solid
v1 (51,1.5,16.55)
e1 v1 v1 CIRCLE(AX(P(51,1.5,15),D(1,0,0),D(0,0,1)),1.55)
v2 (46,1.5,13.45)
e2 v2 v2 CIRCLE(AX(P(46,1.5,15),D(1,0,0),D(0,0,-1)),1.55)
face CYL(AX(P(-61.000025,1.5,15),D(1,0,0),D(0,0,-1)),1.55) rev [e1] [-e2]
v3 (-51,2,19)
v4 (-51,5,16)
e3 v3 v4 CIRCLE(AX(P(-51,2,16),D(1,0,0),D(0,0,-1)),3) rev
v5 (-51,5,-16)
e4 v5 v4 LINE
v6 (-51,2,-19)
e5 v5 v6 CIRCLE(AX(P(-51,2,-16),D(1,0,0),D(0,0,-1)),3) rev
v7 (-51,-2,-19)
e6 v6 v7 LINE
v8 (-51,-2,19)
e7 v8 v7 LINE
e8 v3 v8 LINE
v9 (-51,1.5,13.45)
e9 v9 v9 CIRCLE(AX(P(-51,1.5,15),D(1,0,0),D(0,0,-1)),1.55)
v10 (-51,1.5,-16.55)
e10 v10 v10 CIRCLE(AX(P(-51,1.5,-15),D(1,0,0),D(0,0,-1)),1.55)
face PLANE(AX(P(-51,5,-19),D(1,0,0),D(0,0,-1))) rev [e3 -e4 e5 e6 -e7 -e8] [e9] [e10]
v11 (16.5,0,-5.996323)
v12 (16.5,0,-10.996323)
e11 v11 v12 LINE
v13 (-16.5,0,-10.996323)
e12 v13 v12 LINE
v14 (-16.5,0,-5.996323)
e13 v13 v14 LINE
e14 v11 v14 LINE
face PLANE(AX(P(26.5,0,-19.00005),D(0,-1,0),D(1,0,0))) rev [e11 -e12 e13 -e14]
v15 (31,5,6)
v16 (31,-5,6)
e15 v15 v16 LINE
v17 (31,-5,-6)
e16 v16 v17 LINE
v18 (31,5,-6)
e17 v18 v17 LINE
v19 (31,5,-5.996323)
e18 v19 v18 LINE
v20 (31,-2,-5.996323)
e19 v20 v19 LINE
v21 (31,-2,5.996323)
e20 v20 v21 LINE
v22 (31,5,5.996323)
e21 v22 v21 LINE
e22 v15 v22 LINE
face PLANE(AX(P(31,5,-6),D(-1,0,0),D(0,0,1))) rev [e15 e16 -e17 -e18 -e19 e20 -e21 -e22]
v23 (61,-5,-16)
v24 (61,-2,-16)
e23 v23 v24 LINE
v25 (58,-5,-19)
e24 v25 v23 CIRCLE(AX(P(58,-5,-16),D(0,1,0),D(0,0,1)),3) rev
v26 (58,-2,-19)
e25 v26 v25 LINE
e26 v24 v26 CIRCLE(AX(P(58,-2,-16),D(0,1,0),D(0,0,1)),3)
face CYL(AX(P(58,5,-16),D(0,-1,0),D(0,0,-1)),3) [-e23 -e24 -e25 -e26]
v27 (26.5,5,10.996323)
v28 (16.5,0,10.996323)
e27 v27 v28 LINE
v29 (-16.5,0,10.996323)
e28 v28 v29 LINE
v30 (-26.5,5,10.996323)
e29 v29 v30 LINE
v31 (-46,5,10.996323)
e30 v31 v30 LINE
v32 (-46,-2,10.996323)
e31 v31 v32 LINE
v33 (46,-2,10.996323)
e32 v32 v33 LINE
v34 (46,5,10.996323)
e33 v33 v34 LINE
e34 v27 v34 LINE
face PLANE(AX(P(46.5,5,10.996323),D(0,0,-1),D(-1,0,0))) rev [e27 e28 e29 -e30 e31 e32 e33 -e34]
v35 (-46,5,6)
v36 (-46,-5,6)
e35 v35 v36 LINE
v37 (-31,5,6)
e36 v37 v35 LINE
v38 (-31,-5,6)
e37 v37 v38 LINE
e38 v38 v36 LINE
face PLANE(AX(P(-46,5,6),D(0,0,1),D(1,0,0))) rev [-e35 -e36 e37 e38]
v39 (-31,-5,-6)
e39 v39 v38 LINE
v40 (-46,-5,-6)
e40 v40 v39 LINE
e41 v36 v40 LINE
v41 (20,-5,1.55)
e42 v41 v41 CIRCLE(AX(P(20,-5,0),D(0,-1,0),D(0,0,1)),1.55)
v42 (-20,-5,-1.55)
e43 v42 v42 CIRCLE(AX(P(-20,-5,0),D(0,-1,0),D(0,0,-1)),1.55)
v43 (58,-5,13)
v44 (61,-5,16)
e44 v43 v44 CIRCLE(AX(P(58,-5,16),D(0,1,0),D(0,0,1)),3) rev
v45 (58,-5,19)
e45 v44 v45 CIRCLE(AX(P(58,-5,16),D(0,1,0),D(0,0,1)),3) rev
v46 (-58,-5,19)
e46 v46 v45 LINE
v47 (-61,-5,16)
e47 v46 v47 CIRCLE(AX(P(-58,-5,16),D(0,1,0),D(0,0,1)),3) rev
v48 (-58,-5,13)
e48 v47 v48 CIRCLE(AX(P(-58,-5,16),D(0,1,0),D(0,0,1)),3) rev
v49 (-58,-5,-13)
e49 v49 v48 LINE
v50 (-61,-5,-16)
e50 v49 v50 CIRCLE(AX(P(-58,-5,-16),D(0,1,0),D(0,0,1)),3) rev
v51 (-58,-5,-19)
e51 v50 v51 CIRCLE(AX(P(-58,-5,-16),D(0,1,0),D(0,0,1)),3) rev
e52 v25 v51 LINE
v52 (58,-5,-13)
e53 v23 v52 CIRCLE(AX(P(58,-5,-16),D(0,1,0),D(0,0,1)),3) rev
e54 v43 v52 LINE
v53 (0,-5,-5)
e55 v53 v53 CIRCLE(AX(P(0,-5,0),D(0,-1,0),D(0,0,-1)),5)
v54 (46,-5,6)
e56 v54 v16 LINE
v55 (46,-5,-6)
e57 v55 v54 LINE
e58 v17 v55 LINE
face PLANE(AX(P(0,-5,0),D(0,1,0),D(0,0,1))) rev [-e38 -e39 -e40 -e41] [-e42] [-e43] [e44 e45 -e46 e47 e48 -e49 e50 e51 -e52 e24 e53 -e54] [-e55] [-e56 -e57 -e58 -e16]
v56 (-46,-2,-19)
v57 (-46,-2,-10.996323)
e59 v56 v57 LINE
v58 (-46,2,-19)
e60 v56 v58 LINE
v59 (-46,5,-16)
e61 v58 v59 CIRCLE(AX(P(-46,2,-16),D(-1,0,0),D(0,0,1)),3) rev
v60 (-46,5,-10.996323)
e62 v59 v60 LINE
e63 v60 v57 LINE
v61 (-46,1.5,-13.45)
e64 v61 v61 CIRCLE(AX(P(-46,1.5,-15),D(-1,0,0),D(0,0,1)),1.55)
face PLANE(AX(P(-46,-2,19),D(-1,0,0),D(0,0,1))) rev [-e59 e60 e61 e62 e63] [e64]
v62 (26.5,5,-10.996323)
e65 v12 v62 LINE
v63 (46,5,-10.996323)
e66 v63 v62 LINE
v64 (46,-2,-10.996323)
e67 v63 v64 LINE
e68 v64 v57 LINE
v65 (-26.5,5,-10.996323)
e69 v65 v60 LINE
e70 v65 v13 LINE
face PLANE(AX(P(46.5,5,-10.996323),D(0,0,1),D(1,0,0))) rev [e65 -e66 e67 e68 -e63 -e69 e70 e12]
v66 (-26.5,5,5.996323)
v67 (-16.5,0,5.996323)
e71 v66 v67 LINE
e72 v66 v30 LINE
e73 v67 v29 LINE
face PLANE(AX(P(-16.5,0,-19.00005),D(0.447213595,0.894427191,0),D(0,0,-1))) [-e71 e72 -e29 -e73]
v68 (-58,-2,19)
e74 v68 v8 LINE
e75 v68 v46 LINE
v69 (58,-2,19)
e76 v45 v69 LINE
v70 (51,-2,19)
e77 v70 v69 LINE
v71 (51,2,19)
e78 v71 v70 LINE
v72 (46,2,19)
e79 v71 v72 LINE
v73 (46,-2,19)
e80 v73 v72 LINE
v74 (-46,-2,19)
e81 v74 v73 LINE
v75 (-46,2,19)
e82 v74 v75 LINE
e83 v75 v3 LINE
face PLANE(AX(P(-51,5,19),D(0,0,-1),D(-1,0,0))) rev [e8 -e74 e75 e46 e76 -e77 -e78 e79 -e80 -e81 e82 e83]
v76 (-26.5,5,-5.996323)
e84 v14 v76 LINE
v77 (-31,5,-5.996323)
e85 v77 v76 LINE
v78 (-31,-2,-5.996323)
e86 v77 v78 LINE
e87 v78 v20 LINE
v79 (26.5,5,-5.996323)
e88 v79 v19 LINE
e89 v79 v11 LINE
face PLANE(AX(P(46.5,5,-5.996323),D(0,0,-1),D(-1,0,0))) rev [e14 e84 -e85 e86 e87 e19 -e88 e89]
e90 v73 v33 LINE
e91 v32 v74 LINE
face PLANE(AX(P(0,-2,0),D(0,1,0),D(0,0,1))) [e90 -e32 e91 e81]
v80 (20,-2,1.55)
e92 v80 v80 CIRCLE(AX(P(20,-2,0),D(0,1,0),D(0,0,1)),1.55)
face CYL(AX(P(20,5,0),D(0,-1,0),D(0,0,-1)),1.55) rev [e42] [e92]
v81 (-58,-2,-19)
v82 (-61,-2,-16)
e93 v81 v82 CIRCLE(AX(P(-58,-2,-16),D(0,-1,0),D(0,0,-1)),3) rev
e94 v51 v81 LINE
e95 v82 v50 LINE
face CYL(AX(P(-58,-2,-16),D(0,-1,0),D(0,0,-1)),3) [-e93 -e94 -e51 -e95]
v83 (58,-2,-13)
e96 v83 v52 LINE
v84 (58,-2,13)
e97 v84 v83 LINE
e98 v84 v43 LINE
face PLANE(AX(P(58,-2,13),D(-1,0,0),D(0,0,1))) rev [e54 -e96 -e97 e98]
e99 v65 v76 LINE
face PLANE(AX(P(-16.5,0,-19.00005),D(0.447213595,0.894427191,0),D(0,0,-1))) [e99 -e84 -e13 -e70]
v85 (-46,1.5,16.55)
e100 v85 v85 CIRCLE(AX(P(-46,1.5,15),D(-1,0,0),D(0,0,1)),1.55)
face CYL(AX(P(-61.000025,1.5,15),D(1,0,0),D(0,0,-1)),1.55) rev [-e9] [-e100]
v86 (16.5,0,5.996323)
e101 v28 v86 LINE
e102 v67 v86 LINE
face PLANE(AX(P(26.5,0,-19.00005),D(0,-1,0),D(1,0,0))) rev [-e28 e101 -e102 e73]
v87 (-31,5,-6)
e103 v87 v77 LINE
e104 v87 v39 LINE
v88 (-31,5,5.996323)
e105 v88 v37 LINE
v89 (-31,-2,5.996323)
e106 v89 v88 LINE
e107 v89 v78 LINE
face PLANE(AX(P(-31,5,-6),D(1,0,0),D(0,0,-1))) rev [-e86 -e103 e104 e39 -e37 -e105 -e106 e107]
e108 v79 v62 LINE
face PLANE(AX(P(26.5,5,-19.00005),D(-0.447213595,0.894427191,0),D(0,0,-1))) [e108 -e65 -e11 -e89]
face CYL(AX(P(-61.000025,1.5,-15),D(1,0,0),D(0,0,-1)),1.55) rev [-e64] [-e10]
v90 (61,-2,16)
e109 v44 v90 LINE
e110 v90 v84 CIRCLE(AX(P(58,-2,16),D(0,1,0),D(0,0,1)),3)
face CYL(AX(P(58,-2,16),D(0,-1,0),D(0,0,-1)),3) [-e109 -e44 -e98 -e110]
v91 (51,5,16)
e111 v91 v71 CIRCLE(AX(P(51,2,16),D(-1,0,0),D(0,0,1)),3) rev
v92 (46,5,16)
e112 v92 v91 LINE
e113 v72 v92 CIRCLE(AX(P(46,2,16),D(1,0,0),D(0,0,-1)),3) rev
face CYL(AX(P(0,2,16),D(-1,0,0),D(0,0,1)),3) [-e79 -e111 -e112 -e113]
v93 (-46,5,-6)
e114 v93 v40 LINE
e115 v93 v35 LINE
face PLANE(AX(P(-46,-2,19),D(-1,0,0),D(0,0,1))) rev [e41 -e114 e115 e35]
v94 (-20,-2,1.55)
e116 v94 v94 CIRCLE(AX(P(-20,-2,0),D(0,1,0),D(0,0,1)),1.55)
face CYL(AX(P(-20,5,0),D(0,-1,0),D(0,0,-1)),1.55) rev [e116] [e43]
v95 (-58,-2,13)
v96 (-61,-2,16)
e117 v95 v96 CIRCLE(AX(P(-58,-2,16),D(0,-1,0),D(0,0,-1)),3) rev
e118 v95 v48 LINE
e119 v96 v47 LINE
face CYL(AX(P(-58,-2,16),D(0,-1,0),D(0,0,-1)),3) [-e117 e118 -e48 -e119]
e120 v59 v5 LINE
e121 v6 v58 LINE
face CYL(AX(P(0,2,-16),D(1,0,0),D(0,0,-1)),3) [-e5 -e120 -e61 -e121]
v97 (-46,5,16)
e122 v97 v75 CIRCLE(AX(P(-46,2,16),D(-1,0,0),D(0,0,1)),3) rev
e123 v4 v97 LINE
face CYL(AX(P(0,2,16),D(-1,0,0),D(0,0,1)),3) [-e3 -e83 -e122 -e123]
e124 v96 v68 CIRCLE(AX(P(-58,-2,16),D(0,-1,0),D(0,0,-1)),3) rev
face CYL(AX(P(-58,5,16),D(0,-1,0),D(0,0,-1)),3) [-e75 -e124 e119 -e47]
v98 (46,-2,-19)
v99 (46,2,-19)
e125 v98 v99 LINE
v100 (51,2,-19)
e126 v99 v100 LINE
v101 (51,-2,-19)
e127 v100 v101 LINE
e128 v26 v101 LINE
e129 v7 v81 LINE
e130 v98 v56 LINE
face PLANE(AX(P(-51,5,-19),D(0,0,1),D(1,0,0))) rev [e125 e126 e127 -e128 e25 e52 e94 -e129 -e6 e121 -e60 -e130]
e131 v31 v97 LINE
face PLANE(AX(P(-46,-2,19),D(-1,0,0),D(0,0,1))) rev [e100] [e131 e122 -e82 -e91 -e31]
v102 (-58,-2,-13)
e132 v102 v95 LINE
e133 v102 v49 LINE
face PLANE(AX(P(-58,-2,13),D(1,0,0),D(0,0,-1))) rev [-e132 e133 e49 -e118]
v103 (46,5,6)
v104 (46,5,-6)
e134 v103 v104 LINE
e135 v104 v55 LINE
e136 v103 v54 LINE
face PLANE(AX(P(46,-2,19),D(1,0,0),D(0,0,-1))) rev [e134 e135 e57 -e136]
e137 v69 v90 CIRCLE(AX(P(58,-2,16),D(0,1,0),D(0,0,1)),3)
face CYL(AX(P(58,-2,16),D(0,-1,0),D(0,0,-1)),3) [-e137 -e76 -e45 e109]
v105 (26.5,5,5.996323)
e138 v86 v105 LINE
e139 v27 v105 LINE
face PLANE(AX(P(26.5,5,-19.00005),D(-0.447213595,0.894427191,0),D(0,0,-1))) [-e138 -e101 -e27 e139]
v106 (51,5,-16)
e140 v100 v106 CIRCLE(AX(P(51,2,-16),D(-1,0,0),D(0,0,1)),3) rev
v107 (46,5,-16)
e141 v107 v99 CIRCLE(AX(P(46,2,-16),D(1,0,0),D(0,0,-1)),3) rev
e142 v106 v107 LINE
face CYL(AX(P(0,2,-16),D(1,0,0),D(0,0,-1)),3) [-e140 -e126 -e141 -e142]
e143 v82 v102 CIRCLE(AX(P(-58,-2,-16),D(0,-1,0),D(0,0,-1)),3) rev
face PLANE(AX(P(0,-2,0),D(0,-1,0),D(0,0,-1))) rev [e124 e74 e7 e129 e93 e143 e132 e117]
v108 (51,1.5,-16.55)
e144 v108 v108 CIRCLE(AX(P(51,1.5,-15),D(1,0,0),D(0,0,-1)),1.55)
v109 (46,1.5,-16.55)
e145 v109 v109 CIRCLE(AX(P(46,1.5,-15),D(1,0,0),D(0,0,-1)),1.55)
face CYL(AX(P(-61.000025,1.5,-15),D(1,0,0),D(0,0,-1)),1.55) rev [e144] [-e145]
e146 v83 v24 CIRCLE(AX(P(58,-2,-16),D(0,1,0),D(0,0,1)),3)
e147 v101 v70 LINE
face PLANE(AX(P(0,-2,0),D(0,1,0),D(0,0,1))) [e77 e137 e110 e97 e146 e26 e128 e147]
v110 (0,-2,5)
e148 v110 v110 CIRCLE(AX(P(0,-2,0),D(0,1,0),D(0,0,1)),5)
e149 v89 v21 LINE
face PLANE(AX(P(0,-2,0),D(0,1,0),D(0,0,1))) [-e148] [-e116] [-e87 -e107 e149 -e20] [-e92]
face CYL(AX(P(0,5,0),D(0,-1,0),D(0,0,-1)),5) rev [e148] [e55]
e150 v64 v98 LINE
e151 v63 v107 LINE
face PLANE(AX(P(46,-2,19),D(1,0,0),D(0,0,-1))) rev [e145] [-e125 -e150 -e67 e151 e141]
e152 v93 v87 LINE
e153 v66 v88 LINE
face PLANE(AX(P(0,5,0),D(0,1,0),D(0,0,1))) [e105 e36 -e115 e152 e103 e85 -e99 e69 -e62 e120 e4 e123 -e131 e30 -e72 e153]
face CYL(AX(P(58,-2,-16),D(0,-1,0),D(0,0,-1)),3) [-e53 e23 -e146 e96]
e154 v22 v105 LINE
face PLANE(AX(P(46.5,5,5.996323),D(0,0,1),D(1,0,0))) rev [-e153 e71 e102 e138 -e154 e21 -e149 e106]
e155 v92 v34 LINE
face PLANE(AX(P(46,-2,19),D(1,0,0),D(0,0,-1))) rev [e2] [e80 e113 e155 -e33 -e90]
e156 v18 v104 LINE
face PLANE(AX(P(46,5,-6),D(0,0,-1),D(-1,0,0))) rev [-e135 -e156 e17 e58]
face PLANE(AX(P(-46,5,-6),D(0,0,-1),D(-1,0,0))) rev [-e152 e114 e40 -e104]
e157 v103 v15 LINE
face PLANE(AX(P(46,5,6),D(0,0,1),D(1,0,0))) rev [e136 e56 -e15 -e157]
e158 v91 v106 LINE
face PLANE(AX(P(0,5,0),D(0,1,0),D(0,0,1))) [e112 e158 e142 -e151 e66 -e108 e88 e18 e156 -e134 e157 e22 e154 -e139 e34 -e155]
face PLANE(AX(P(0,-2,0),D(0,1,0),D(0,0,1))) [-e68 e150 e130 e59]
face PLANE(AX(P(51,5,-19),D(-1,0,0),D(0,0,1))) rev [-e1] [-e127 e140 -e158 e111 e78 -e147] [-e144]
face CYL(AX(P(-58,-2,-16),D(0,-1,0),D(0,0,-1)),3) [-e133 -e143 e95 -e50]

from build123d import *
from OCP.BRepFilletAPI import BRepFilletAPI_MakeChamfer

# Parameters (mm, degrees)
SKETCH_1_W               = 102
SKETCH_1_H               = 38
EXTRUDE_1_DEPTH          = 5
EXTRUDE_START            = -10
EXTRUDE_2_DEPTH          = 3
SKETCH_23_W              = 92
SKETCH_23_H              = 38
CUT_EXTRUDE_4_DEPTH      = 7
SKETCH_25_W              = 92.5
SKETCH_25_H              = 5
EXTRUDE_3_DEPTH          = 7
SKETCH_21_R              = 1.55
SKETCH_21_R_2            = 5
SKETCH_21_W              = 15
SKETCH_21_H              = 12
CUT_EXTRUDE_1_DEPTH      = 10
CUT_EXTRUDE_7_DEPTH      = 65.08587988
CUT_EXTRUDE_7_DEPTH_BACK = 65.08587988
SKETCH_27_W              = 53
SKETCH_27_H              = 12
CHAMFER_1_SIZE           = 5
CHAMFER_1_SIZE_2         = 10
CHAMFER_2_SIZE           = 5
CHAMFER_2_SIZE_2         = 10
SKETCH2_R                = 1.55
CUT_EXTRUDE1_DEPTH       = 114.710157858
FILLET1_R                = 3
FILLET2_R                = 3


with BuildPart() as part:
    # 草图1 → 凸台-拉伸1 (new, symmetric)
    with BuildSketch(Plane(origin=(0, 0, 0), x_dir=(1, 0, 0), z_dir=(0, 1, 0))):
        Rectangle(SKETCH_1_W, SKETCH_1_H)
    extrude(amount=EXTRUDE_1_DEPTH, both=True)

    # 草图4 → 凸台-拉伸2 (add)
    with BuildSketch(Plane(origin=(0, 5, 0), x_dir=(1, 0, 0), z_dir=(0, 1, 0)).offset(EXTRUDE_START)):
        Polygon((61, -19), (51, -19), (51, 19), (61, 19), (61, 13), (58, 13), (58, -13), (61, -13), align=None)
        Polygon((-61, 19), (-61, 13), (-58, 13), (-58, -13), (-61, -13), (-61, -19), (-51, -19), (-51, 19), align=None)
    extrude(amount=EXTRUDE_2_DEPTH)

    # 草图23 → 切除-拉伸4 (cut)
    with BuildSketch(Plane(origin=(0, 5, 0), x_dir=(1, 0, 0), z_dir=(0, 1, 0))):
        Rectangle(SKETCH_23_W, SKETCH_23_H)
    extrude(amount=-CUT_EXTRUDE_4_DEPTH, mode=Mode.SUBTRACT)

    # 草图25 → 凸台-拉伸3 (add)
    with BuildSketch(Plane(origin=(0, -2, 0), x_dir=(1, 0, 0), z_dir=(0, 1, 0))):
        with Locations((0.25, -8.496322734)):
            Rectangle(SKETCH_25_W, SKETCH_25_H)
        with Locations((0.25, 8.496322734)):
            Rectangle(SKETCH_25_W, SKETCH_25_H)
    extrude(amount=EXTRUDE_3_DEPTH)

    # 草图21 → 切除-拉伸1 (cut)
    with BuildSketch(Plane(origin=(0, -5, 0), x_dir=(-1, 0, 0), z_dir=(0, -1, 0))):
        with Locations(Location((-20, 0, 0), (0, 0, 270))):
            Circle(SKETCH_21_R)
        with Locations(Location((20, 0, 0), (0, 0, 90))):
            Circle(SKETCH_21_R)
        with Locations(Location((0, 0, 0), (0, 0, 90))):
            Circle(SKETCH_21_R_2)
        with Locations((-38.5, 0)):
            Rectangle(SKETCH_21_W, SKETCH_21_H)
        with Locations((38.5, 0)):
            Rectangle(SKETCH_21_W, SKETCH_21_H)
    extrude(amount=-CUT_EXTRUDE_1_DEPTH, mode=Mode.SUBTRACT)

    # 草图27 → 切除-拉伸7 (cut, two sides: drawn at the far end of the back side and taken through both)
    with BuildSketch(Plane.XY.offset(-CUT_EXTRUDE_7_DEPTH_BACK)):
        with Locations((0, 6)):
            Rectangle(SKETCH_27_W, SKETCH_27_H)
    extrude(amount=CUT_EXTRUDE_7_DEPTH + CUT_EXTRUDE_7_DEPTH_BACK, mode=Mode.SUBTRACT)

    # 倒角1
    chamfer_1_edges_1 = [part.edges().sort_by_distance(p)[0] for p in [
        (26.5, 0, -8.496322734),
    ]]
    chamfer_1_side_1 = [part.faces().sort_by_distance(p)[0] for p in [
        (26.5, 0.1, -8.496322734),
    ]]
    chamfer_1_edges_2 = [part.edges().sort_by_distance(p)[0] for p in [
        (26.5, 0, 8.496322734),
    ]]
    chamfer_1_side_2 = [part.faces().sort_by_distance(p)[0] for p in [
        (26.5, 0.1, 8.496322734),
    ]]
    chamfer_1 = BRepFilletAPI_MakeChamfer(part.part.solid().wrapped)
    for e in chamfer_1_edges_1:
        chamfer_1.Add(CHAMFER_1_SIZE - 0.0001, CHAMFER_1_SIZE_2 - 0.0001, e.wrapped, chamfer_1_side_1[0].wrapped)
    for e in chamfer_1_edges_2:
        chamfer_1.Add(CHAMFER_1_SIZE - 0.0001, CHAMFER_1_SIZE_2 - 0.0001, e.wrapped, chamfer_1_side_2[0].wrapped)
    add(Compound.cast(chamfer_1.Shape()), mode=Mode.REPLACE)  # a hair under: the kernel refuses the full size

    # 倒角2
    chamfer_2_edges_1 = [part.edges().sort_by_distance(p)[0] for p in [
        (-26.5, 0, -8.496322734),
    ]]
    chamfer_2_side_1 = [part.faces().sort_by_distance(p)[0] for p in [
        (-26.5, 0.1, -8.496322734),
    ]]
    chamfer_2_edges_2 = [part.edges().sort_by_distance(p)[0] for p in [
        (-26.5, 0, 8.496322734),
    ]]
    chamfer_2_side_2 = [part.faces().sort_by_distance(p)[0] for p in [
        (-26.4, 0, 8.496322734),
    ]]
    chamfer_2 = BRepFilletAPI_MakeChamfer(part.part.solid().wrapped)
    for e in chamfer_2_edges_1:
        chamfer_2.Add(CHAMFER_2_SIZE - 0.0001, CHAMFER_2_SIZE_2 - 0.0001, e.wrapped, chamfer_2_side_1[0].wrapped)
    for e in chamfer_2_edges_2:
        chamfer_2.Add(CHAMFER_2_SIZE_2 - 0.0001, CHAMFER_2_SIZE - 0.0001, e.wrapped, chamfer_2_side_2[0].wrapped)
    add(Compound.cast(chamfer_2.Shape()), mode=Mode.REPLACE)  # a hair under: the kernel refuses the full size

    # Sketch2 → Cut-Extrude1 (cut, through all)
    with BuildSketch(Plane(origin=(51, 0, 0), x_dir=(0, 0, -1), z_dir=(1, 0, 0))):
        with Locations((15, 1.5)):
            Circle(SKETCH2_R)
        with Locations((-15, 1.5)):
            Circle(SKETCH2_R)
    extrude(amount=-CUT_EXTRUDE1_DEPTH, mode=Mode.SUBTRACT)

    # Fillet1
    fillet1_edges = [part.edges().sort_by_distance(p)[0] for p in [
        (-61, -3.5, 19),
        (-61, -3.5, 13),
        (-61, -3.5, -13),
        (-61, -3.5, -19),
        (61, -3.5, -13),
        (61, -3.5, -19),
        (61, -3.5, 19),
        (61, -3.5, 13),
    ]]
    fillet(fillet1_edges, radius=FILLET1_R - 0.0001)  # a hair under: the kernel refuses the full size

    # Fillet2
    fillet2_edges = [part.edges().sort_by_distance(p)[0] for p in [
        (-48.5, 5, -19),
        (-48.5, 5, 19),
        (48.5, 5, 19),
        (48.5, 5, -19),
    ]]
    fillet(fillet2_edges, radius=FILLET2_R)


solid = part.part
